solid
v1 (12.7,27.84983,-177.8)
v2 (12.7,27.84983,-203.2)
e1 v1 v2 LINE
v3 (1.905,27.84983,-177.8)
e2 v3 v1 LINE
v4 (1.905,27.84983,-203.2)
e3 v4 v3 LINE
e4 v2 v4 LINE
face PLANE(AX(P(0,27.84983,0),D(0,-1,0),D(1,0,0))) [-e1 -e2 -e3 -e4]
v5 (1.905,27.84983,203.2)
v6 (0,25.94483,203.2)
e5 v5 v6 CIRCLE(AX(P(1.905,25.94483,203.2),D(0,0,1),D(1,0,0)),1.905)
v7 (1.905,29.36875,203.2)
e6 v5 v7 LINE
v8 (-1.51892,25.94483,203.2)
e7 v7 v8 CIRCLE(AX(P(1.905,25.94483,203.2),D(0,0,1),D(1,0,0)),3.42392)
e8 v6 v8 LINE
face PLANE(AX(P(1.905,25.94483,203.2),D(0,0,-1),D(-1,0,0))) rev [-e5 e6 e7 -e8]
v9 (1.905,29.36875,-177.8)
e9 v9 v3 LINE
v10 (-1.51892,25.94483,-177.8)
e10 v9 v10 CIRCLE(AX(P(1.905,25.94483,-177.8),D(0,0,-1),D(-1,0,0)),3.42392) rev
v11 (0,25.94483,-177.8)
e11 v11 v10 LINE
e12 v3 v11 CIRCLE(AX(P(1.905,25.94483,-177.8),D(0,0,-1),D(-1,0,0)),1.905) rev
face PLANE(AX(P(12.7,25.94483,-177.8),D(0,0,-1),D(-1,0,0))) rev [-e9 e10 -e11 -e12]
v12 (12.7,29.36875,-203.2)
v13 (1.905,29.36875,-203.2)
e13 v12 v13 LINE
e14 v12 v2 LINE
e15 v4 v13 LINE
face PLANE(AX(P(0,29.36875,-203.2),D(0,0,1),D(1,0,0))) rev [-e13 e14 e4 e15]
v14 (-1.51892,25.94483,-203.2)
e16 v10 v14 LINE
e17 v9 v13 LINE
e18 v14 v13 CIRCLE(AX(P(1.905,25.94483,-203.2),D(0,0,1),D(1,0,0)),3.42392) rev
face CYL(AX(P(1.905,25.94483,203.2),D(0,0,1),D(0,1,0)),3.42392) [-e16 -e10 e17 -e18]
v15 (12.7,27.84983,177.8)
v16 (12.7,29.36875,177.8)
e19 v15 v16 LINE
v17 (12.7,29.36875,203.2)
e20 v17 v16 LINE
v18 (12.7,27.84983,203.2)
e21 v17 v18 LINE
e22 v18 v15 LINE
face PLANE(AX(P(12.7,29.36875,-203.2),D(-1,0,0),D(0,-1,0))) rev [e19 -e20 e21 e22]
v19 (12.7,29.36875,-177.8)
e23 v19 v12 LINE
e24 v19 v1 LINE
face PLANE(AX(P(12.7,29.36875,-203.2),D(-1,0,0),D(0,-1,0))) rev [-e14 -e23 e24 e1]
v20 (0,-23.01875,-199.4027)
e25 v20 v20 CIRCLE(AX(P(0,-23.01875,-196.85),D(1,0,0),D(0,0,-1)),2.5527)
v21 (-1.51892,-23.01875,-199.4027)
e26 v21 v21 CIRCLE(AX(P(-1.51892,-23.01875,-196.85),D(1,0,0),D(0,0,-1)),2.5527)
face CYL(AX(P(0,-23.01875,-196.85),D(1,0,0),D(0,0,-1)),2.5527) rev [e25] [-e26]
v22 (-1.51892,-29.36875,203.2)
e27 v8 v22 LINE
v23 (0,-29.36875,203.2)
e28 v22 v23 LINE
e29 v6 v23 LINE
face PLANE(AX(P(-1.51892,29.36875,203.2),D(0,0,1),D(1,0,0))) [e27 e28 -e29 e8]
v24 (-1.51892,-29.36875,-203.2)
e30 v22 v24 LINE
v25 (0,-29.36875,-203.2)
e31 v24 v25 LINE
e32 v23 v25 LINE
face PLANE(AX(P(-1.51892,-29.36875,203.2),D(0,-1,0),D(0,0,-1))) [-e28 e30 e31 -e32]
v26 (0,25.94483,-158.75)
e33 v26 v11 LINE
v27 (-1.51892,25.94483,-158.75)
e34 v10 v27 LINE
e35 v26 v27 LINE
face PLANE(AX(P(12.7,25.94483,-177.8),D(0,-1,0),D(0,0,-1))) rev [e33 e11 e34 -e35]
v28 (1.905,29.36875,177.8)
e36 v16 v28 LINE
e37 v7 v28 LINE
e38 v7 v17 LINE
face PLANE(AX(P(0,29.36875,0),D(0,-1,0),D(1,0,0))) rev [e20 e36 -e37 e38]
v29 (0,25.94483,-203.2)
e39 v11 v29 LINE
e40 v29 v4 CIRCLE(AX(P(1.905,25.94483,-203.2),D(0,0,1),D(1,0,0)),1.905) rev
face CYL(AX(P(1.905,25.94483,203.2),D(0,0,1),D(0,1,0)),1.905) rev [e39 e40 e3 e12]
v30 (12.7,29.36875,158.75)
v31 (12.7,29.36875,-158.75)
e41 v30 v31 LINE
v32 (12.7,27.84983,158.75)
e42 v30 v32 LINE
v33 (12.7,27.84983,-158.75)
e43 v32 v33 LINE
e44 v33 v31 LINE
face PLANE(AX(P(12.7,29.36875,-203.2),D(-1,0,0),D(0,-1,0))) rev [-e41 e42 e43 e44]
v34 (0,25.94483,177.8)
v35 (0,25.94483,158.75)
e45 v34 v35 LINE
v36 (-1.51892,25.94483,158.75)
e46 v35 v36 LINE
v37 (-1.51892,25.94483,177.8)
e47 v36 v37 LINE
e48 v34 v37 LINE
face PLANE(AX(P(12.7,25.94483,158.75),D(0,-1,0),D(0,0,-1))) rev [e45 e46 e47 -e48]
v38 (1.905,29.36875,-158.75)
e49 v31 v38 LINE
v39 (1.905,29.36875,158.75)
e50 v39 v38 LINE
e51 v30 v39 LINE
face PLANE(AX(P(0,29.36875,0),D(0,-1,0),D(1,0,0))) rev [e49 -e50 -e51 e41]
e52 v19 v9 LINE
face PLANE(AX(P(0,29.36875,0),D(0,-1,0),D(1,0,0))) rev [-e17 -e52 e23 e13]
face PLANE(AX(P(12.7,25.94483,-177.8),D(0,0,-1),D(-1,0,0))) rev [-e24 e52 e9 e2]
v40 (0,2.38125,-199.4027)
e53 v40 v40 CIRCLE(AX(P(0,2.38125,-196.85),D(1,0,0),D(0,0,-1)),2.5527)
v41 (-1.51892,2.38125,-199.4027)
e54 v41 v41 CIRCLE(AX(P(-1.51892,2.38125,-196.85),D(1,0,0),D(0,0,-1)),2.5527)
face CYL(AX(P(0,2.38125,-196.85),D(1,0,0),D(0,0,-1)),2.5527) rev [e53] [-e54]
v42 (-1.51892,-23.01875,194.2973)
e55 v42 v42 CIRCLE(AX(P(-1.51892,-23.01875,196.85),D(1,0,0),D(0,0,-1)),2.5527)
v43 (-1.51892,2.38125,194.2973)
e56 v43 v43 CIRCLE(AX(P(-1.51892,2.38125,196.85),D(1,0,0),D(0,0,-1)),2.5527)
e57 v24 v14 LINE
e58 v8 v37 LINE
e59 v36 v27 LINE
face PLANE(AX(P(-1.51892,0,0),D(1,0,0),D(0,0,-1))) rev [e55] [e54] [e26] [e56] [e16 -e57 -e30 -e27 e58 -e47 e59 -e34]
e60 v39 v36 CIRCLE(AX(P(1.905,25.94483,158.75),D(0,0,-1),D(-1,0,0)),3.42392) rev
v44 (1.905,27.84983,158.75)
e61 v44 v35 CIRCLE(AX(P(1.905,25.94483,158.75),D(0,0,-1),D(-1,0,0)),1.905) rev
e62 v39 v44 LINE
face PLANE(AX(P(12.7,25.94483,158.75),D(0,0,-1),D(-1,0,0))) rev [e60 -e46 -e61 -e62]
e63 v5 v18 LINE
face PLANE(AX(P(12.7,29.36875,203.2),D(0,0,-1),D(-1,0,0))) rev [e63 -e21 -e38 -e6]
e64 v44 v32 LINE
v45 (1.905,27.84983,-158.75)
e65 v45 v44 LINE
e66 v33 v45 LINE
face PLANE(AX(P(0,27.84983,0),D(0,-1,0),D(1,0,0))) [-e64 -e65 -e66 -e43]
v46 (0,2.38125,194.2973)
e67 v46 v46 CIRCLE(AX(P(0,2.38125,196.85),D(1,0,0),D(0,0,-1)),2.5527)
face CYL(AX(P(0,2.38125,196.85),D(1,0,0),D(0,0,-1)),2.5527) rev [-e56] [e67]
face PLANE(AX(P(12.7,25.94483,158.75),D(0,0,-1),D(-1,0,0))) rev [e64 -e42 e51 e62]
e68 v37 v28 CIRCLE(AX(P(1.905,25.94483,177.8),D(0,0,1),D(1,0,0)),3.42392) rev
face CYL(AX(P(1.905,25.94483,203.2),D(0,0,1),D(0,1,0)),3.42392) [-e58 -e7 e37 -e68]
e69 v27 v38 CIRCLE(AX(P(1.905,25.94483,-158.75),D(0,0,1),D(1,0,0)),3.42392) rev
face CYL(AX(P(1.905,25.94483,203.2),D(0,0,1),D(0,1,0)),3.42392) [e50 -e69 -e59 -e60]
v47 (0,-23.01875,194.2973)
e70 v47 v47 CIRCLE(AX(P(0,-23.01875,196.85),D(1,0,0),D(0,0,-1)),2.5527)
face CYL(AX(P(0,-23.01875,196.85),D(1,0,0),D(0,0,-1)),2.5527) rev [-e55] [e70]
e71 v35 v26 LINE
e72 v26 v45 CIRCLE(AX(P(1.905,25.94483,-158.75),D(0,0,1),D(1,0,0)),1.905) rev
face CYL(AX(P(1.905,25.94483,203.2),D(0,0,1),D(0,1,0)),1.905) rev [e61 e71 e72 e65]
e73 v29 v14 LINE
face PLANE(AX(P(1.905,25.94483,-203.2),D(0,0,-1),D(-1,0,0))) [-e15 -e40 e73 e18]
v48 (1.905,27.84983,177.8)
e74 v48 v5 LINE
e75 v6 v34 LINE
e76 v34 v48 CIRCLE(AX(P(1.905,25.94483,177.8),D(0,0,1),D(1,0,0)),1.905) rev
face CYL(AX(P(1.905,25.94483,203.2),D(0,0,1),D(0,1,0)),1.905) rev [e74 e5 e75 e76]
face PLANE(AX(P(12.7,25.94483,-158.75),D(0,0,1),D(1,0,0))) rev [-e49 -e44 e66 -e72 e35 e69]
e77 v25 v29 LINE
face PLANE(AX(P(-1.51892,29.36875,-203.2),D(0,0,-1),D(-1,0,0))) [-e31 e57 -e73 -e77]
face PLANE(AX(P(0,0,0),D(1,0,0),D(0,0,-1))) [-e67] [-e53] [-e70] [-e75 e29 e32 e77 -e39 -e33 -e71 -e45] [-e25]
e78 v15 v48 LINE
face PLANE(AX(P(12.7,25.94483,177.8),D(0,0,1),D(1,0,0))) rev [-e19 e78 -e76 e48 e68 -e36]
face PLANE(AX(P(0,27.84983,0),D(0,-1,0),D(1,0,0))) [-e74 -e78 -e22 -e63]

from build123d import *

# Parameters (mm, degrees)
SKETCH1_W                    = 406.4
SKETCH1_H                    = 58.7375
BASE_FLANGE1_DEPTH           = 1.51892
EDGE_FLANGE1_STRIP_W         = 9.88568
EDGE_FLANGE1_STRIP_H         = 1.51892
EDGE_FLANGE1_STRIP_CUT_DEPTH = 406.4
EDGE_FLANGE1_DEPTH           = 406.4
SKETCH10_W                   = 19.05
SKETCH10_H                   = 3.42392
CUT_EXTRUDE2_DEPTH           = 206.803161206
F_10_CLEARANCE_HOLE1_D       = 5.1054


# Sheet-metal steps are written as plain solids
with BuildPart() as part:
    # Sketch1 → Base-Flange1 (new body)
    with BuildSketch(Plane(origin=(0, 0, 0), x_dir=(0, 0, -1), z_dir=(1, 0, 0))):
        Rectangle(SKETCH1_W, SKETCH1_H)
    extrude(amount=-BASE_FLANGE1_DEPTH)

    # Edge-Flange1 strip (across the edge) → Edge-Flange1 strip cut (cut)
    with BuildSketch(Plane(origin=(0, 29.36875, -203.2), x_dir=(0, -1, 0), z_dir=(0, 0, 1))):
        with Locations((-1.51892, -0.75946)):
            Rectangle(EDGE_FLANGE1_STRIP_W, EDGE_FLANGE1_STRIP_H)
    extrude(amount=EDGE_FLANGE1_STRIP_CUT_DEPTH, mode=Mode.SUBTRACT)

    # Edge-Flange1 section (across the edge) → Edge-Flange1 (add)
    with BuildSketch(Plane(origin=(0, 29.36875, -203.2), x_dir=(0, -1, 0), z_dir=(0, 0, 1))):
        with BuildLine():
            Line((0, 1.905), (0, 12.7))
            Line((0, 12.7), (1.51892, 12.7))
            Line((1.51892, 12.7), (1.51892, 1.905))
            ThreePointArc((1.51892, 1.905), (2.076881582, 0.557961582), (3.42392, 0))
            Line((3.42392, 0), (3.42392, -1.51892))
            ThreePointArc((3.42392, -1.51892), (1.00284295, -0.51607705), (0, 1.905))
        make_face()
    extrude(amount=EDGE_FLANGE1_DEPTH)

    # Sketch10 → Cut-Extrude2 (cut, through all)
    with BuildSketch(Plane.ZY.offset(1.51892)):
        with Locations((-168.275, 27.65679)):
            Rectangle(SKETCH10_W, SKETCH10_H)
        with Locations((168.275, 27.65679)):
            Rectangle(SKETCH10_W, SKETCH10_H)
    extrude(amount=-CUT_EXTRUDE2_DEPTH, mode=Mode.SUBTRACT)

    # #10 Clearance Hole1 (through all)
    with Locations(Plane(origin=(0, 0, 0), x_dir=(0, 0, -1), z_dir=(1, 0, 0))):
        with Locations((-196.85, 2.38125), (196.85, -23.01875), (-196.85, -23.01875), (196.85, 2.38125)):
            Hole(F_10_CLEARANCE_HOLE1_D / 2)


solid = part.part
